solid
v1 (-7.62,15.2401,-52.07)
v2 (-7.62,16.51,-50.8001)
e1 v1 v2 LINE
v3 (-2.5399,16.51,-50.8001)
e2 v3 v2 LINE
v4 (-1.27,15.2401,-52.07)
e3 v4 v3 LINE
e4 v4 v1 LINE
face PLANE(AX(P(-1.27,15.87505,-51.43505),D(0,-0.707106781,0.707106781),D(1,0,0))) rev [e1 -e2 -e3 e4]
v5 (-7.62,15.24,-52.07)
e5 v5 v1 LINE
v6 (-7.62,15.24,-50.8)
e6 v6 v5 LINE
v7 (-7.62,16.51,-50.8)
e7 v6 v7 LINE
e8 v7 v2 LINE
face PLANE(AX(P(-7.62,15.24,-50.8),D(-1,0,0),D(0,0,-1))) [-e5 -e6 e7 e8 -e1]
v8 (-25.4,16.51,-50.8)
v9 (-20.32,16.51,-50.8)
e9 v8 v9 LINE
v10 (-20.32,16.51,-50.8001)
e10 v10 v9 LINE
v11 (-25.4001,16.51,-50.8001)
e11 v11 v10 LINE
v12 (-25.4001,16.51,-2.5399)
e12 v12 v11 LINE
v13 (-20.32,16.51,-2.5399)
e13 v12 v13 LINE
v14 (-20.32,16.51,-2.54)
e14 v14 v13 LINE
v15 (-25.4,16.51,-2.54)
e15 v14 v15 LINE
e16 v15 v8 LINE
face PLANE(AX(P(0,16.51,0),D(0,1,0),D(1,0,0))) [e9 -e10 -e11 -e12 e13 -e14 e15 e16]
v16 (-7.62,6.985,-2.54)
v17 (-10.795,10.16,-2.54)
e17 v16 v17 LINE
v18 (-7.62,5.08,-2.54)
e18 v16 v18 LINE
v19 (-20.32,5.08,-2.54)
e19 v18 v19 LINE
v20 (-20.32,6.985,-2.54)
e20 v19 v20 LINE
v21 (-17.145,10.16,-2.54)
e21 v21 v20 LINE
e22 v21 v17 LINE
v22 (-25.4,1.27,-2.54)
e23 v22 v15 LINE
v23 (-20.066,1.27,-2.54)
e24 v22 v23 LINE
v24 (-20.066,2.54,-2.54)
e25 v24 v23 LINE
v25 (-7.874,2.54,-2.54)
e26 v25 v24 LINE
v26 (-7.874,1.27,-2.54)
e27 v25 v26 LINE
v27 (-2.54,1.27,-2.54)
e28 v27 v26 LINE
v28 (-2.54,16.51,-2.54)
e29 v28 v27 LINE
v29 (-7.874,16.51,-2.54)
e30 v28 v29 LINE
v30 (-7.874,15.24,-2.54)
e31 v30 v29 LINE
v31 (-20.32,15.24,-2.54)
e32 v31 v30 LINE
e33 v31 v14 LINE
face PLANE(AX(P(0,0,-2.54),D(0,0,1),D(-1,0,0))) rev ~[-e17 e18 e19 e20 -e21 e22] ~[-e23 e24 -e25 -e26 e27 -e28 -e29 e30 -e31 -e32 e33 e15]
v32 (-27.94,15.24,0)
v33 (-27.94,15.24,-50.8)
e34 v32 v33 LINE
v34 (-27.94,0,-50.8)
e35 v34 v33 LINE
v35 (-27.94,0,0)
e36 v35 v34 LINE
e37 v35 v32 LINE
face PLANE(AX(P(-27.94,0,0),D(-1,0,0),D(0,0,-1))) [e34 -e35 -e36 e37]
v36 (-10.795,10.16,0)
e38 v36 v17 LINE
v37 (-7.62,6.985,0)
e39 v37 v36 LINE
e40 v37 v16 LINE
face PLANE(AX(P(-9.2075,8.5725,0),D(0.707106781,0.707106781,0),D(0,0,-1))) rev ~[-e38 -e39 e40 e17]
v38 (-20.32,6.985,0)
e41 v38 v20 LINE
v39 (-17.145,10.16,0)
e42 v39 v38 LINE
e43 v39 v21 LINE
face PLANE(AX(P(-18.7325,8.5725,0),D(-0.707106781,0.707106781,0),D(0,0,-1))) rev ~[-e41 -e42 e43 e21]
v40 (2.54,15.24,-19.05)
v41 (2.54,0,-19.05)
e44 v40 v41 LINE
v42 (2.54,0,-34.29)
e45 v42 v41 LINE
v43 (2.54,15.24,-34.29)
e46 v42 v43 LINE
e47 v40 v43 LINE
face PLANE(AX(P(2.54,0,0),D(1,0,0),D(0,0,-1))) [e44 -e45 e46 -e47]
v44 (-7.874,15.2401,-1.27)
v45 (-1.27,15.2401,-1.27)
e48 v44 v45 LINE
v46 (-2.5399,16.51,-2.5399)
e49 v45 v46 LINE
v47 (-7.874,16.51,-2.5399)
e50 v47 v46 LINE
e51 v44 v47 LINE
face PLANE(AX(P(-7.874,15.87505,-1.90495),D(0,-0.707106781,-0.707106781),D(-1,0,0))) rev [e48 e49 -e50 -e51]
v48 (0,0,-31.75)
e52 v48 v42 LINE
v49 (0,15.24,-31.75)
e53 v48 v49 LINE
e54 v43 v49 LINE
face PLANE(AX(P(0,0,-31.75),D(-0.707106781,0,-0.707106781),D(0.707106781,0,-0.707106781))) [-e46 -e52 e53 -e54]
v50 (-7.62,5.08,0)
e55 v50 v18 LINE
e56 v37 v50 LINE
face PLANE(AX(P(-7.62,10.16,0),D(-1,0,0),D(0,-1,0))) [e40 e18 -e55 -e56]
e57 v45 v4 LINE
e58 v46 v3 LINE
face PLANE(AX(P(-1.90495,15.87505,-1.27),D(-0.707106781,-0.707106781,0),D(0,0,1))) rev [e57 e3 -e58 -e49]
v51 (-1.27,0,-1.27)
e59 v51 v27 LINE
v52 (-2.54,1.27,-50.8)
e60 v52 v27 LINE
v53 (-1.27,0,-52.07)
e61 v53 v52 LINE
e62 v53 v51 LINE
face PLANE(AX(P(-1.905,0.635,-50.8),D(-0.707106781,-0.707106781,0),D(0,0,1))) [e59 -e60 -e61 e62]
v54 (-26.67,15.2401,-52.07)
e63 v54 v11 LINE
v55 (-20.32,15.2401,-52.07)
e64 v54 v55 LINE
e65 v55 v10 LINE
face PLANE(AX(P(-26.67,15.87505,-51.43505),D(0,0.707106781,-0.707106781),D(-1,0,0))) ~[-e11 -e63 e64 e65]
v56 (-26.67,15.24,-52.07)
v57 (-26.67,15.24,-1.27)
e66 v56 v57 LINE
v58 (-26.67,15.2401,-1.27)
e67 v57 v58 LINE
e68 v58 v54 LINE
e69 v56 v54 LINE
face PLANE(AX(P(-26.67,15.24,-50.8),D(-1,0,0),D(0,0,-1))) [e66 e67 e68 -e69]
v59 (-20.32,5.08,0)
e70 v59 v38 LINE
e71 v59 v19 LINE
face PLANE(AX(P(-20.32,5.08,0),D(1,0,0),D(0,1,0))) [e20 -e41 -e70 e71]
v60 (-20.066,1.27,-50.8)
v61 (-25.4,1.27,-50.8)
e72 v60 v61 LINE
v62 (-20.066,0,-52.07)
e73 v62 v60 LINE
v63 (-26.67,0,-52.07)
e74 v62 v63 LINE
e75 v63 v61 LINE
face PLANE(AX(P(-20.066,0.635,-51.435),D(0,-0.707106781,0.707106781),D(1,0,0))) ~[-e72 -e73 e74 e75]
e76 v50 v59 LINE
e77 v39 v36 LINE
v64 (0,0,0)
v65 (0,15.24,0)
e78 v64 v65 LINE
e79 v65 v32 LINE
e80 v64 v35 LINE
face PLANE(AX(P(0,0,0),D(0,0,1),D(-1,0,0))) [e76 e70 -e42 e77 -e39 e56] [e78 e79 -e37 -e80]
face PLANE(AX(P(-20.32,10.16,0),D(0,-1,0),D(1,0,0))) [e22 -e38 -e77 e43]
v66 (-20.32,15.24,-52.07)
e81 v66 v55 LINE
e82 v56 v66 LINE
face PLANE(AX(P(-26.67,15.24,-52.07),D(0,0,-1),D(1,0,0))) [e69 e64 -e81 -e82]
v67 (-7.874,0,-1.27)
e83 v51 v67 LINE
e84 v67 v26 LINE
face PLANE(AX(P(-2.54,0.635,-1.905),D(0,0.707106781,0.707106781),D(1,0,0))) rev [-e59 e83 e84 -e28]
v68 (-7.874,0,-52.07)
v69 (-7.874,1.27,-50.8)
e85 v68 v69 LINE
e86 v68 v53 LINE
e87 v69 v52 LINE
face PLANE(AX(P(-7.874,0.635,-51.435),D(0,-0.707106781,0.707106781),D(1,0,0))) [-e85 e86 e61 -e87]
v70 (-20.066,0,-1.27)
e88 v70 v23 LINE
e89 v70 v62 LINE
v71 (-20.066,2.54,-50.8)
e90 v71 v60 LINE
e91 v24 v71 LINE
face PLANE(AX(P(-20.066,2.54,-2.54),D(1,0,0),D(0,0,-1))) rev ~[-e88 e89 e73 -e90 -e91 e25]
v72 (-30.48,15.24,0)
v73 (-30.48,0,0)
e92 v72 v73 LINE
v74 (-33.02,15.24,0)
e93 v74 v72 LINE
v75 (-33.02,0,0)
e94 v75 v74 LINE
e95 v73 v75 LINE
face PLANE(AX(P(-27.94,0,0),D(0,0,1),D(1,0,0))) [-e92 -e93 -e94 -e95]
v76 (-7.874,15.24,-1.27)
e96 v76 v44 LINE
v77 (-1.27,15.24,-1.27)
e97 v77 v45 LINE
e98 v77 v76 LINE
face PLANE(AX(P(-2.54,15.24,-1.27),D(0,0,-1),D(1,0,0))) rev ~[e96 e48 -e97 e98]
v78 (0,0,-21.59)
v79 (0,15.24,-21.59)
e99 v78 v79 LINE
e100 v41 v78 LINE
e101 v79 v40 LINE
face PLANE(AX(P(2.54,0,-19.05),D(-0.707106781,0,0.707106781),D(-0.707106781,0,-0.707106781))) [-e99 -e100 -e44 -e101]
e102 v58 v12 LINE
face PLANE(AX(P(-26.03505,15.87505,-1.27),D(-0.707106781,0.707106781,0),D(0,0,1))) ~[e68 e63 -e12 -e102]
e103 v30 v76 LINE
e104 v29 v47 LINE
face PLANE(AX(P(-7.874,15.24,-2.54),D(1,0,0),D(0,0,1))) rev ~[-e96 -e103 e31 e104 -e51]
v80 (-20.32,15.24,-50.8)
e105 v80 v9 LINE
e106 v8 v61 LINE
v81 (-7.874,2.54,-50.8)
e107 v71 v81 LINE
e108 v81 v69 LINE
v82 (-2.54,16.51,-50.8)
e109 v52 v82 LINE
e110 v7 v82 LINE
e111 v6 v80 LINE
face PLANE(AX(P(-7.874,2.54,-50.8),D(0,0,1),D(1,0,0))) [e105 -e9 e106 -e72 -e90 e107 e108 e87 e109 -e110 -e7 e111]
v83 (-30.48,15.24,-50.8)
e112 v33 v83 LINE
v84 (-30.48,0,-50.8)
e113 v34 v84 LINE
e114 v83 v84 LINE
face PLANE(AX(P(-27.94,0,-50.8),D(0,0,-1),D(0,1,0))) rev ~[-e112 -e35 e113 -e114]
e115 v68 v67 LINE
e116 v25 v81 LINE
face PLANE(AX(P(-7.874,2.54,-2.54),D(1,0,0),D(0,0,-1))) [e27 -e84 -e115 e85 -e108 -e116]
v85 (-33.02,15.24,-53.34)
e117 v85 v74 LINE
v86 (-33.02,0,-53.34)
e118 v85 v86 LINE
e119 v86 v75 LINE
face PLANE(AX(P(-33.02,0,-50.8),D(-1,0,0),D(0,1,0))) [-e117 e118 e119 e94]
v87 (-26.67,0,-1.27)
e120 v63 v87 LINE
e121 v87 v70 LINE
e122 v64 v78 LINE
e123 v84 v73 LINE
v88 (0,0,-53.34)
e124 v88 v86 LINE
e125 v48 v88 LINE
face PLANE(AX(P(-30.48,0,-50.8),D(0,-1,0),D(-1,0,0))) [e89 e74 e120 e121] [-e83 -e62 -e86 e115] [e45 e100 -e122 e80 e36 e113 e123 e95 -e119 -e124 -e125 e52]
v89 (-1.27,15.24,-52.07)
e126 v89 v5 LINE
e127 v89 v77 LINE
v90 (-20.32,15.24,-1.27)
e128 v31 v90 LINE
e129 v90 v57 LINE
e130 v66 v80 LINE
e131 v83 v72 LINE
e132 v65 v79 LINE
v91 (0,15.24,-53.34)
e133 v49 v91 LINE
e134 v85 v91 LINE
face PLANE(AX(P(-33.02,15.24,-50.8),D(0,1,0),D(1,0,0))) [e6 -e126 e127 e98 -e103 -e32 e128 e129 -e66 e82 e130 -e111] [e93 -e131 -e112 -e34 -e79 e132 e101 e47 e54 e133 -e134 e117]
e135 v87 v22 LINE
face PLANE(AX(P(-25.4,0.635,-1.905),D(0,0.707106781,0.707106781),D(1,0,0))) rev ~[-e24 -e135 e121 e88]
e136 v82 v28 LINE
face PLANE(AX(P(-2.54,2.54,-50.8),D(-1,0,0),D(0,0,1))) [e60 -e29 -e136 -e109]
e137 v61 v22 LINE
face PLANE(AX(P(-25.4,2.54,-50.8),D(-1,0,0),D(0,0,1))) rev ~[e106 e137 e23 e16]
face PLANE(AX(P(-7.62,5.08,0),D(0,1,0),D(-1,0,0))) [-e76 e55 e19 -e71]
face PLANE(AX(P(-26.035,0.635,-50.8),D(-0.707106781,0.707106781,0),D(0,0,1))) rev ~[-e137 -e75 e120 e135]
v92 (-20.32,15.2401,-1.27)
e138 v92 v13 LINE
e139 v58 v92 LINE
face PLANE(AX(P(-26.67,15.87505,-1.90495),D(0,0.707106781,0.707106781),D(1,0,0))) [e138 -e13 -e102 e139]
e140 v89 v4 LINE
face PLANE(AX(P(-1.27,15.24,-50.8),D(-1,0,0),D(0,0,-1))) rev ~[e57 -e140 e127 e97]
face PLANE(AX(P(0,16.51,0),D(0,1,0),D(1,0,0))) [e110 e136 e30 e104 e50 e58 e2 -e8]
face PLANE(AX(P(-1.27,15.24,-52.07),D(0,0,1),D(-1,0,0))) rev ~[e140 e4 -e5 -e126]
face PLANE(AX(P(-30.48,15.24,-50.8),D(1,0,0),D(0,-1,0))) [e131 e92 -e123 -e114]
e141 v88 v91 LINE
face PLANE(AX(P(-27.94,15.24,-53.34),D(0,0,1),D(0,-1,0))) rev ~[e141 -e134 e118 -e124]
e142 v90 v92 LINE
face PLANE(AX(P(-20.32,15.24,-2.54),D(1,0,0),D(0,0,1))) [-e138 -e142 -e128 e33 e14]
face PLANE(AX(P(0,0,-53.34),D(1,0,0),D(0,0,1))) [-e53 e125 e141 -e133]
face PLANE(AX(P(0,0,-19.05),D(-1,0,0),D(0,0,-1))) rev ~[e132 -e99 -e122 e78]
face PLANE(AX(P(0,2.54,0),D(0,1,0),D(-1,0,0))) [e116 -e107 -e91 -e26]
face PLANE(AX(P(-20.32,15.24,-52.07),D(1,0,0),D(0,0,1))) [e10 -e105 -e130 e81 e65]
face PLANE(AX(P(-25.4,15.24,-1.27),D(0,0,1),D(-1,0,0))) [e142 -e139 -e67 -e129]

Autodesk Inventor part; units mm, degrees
ref_plane "YZ Plane" through (0, 0, 0) normal (1, 0, 0) x (0, 1, 0)
ref_plane "XZ Plane" through (0, 0, 0) normal (0, 1, 0) x (-1, 0, 0)
ref_plane "XY Plane" through (0, 0, 0) normal (0, 0, 1) x (1, 0, 0)
sketch "Sketch1" plane through (0, 0, 0) normal (0, 1, 0) x (-1, 0, 0)
  line L0 (0, 0) -> (27.94, 0)
  line L1 (27.94, 0) -> (27.94, -53.34)
  line L2 (27.94, -53.34) -> (0, -53.34)
  line L3 (0, -53.34) -> (0, 0)
  dimension "d0" = 27.94
  dimension "d1" = 53.34
extrude "Extrusion1" add sketch "Sketch1" along normal blind 15.24
shell "Shell1" thickness 2.54 removed faces 1 at (-9.3133, 15.24, -17.78)
sketch "Sketch3" plane through (-27.94, 0, 0) normal (0, 0, 1) x (1, 0, 0)
  line L0 (20.32, 5.08) -> (7.62, 5.08)
  line L1 (7.62, 5.08) -> (7.62, 10.16)
  line L2 (7.62, 10.16) -> (20.32, 10.16)
  line L3 (20.32, 10.16) -> (20.32, 5.08)
  point P0 (27.94, 0)
  dimension "d20" = 5.08
  dimension "d21" = 12.7
  dimension "d22" = 5.08
  dimension "d23" = 7.62
extrude "Extrusion3" cut sketch "Sketch3" against normal blind 2.54
chamfer "Chamfer1" distance 3.175 angle 45 2 edges at (-20.32, 10.16, -1.27) (-7.62, 10.16, -1.27)
sketch "Sketch5" plane through (-25.4, 2.54, -2.54) normal (0, 1, 0) x (1, 0, 0)
  line L0 (0, 0) -> (5.334, 0)
  line L1 (5.334, 0) -> (5.334, 48.26)
  line L2 (5.334, 48.26) -> (0, 48.26)
  line L3 (0, 48.26) -> (0, 0)
  line L4 (0, 48.26) -> (22.86, 48.26) projected
  line L5 (22.86, 0) -> (17.526, 0)
  line L6 (17.526, 0) -> (17.526, 48.26)
  line L7 (17.526, 48.26) -> (22.86, 48.26)
  line L8 (22.86, 48.26) -> (22.86, 0)
  point P0 (25.4, -2.54)
  dimension "d29" = 5.334
  dimension "d30" = 5.334
extrude "Extrusion4" cut sketch "Sketch5" against normal blind 2.54
sketch "Sketch6" plane through (-27.94, 0, -53.34) normal (-1, 0, 0) x (0, 0, 1)
  point P0 (53.34, 0)
sketch "Sketch7" plane through (-27.94, 0, -53.34) normal (-1, 0, 0) x (0, 0, 1)
  line L0 (2.54, 15.24) -> (50.8, 15.24) projected
  line L1 (0, 0) -> (2.54, 0)
  line L2 (2.54, 0) -> (2.54, 15.24)
  line L3 (2.54, 15.24) -> (0, 15.24)
  line L4 (0, 15.24) -> (0, 0)
  point P0 (53.34, 0)
  dimension "d33" = 2.54
extrude "Extrusion5" add sketch "Sketch7" along normal blind 5.08
sketch "Sketch8" plane through (-27.94, 0, -50.8) normal (0, 0, 1) x (1, 0, 0)
  line L0 (-5.08, 15.24) -> (-2.54, 15.24)
  line L1 (-2.54, 15.24) -> (-2.54, 0)
  line L2 (-2.54, 0) -> (-5.08, 0)
  line L3 (-5.08, 0) -> (-5.08, 15.24)
  point P0 (27.94, 0)
  dimension "d36" = 2.54
extrude "Extrusion6" add sketch "Sketch8" along normal up to surface (50.8 mm away)
chamfer "Chamfer2" distance 1.27 angle 45 6 edges at (-2.54, 0, -26.67) (-5.207, 0, -2.54) (-5.207, 0, -50.8) (-22.733, 0, -2.54) (-25.4, 0, -26.67) (-22.733, 0, -50.8)
sketch "Sketch11" plane through (0, 15.24, 0) normal (0, 1, 0) x (1, 0, 0)
  line L0 (-26.67, 52.07) -> (-17.78, 52.07)
  line L1 (-20.32, 1.27) -> (-26.67, 1.27)
  line L2 (-26.67, 1.27) -> (-26.67, 52.07)
  line L3 (-25.4, 2.54) -> (-25.4, 50.8) projected
  line L4 (-2.54, 2.54) -> (-25.4, 2.54) projected
  line L5 (-25.4, 50.8) -> (-2.54, 50.8) projected
  line L6 (-1.27, 52.07) -> (-7.62, 52.07)
  line L7 (-7.874, 1.27) -> (-1.27, 1.27)
  line L8 (-1.27, 1.27) -> (-1.27, 52.07)
  line L9 (-2.54, 50.8) -> (-2.54, 2.54) projected
  line L10 (-7.62, 52.07) -> (-1.27, 52.07)
  line L11 (-1.27, 52.07) -> (-1.27, 50.8)
  line L12 (-1.27, 50.8) -> (-7.62, 50.8)
  line L13 (-7.62, 50.8) -> (-7.62, 52.07)
  line L14 (-2.54, 50.8) -> (-1.27, 50.8)
  line L15 (-1.27, 50.8) -> (-1.27, 1.27)
  line L16 (-1.27, 1.27) -> (-2.54, 1.27)
  line L17 (-2.54, 1.27) -> (-2.54, 50.8)
  line L18 (-2.54, 2.54) -> (-7.874, 2.54)
  line L19 (-7.874, 2.54) -> (-7.874, 1.27)
  line L20 (-7.874, 1.27) -> (-2.54, 1.27)
  line L21 (-2.54, 1.27) -> (-2.54, 2.54)
  line L22 (-26.67, 52.07) -> (-20.32, 52.07)
  line L23 (-20.32, 52.07) -> (-20.32, 50.8)
  line L24 (-20.32, 50.8) -> (-26.67, 50.8)
  line L25 (-26.67, 50.8) -> (-26.67, 52.07)
  line L26 (-25.4, 50.8) -> (-26.67, 50.8)
  line L27 (-26.67, 50.8) -> (-26.67, 1.27)
  line L28 (-26.67, 1.27) -> (-25.4, 1.27)
  line L29 (-25.4, 1.27) -> (-25.4, 50.8)
  line L30 (-25.4, 2.54) -> (-20.32, 2.54)
  line L31 (-20.32, 2.54) -> (-20.32, 1.27)
  line L32 (-20.32, 1.27) -> (-25.4, 1.27)
  line L33 (-25.4, 1.27) -> (-25.4, 2.54)
  point P0 (0, 0)
  dimension "d50" = 1.27
  dimension "d51" = 1.27
  dimension "d52" = 1.27
  dimension "d55" = 1.27
  dimension "d57" = 1.27
  dimension "d58" = 5.08
  dimension "d59" = 48.26
  dimension "d60" = 6.35
  dimension "d61" = 6.35
extrude "Extrusion8" add sketch "Sketch11" along normal blind 1.27 contours L0 L23 L5 L24 L2 | L24 L3 L29 L1 L2 | L13 L6 L8 L12 L5 | L29 L4 L31 L1 | L12 L8 L7 L17 L9 | L17 L7 L19 L4
chamfer "Chamfer3" distance 1.27 angle 45 6 edges at (-1.27, 16.51, -26.67) (-4.572, 16.51, -1.27) (-4.445, 16.51, -52.07) (-23.495, 16.51, -52.07) (-26.67, 16.51, -26.67) (-23.495, 16.51, -1.27)
sketch "Sketch12" plane through (0, 0, 0) normal (1, 0, 0) x (0, 0, -1)
  line L0 (52.07, 0) -> (1.27, 0) projected
  line L1 (0, 15.24) -> (53.34, 15.24) projected
  line L2 (19.05, 0) -> (34.29, 0)
  line L3 (34.29, 0) -> (34.29, 15.24)
  line L4 (34.29, 15.24) -> (19.05, 15.24)
  line L5 (19.05, 15.24) -> (19.05, 0)
  line L6 (0, 0) -> (0, 15.24) projected
  line L7 (53.34, 0) -> (53.34, 15.24) projected
  dimension "d67" = 19.05
  dimension "d68" = 19.05
extrude "Extrusion9" add sketch "Sketch12" along normal blind 2.54
sketch "Sketch14" plane through (0, 0, 0) normal (0, -1, 0) x (1, 0, 0)
  line L0 (0, -19.05) -> (0, -21.59)
  line L1 (2.54, -19.05) -> (0, -21.59)
  line L2 (0, -34.29) -> (0, -31.75)
  line L3 (0, -31.75) -> (2.54, -34.29)
  line L4 (0, -19.05) -> (2.54, -19.05)
  line L5 (0, -19.05) -> (2.54, -19.05) projected
  line L6 (2.54, -34.29) -> (0, -34.29)
  line L7 (0, -53.34) -> (0, -34.29) projected
  point P0 (0, 0)
  dimension "d71" = 2.54
  dimension "d72" = 2.54
extrude "Extrusion10" cut sketch "Sketch14" against normal blind 25.4
properties part number "nano_enclosure_modular"
